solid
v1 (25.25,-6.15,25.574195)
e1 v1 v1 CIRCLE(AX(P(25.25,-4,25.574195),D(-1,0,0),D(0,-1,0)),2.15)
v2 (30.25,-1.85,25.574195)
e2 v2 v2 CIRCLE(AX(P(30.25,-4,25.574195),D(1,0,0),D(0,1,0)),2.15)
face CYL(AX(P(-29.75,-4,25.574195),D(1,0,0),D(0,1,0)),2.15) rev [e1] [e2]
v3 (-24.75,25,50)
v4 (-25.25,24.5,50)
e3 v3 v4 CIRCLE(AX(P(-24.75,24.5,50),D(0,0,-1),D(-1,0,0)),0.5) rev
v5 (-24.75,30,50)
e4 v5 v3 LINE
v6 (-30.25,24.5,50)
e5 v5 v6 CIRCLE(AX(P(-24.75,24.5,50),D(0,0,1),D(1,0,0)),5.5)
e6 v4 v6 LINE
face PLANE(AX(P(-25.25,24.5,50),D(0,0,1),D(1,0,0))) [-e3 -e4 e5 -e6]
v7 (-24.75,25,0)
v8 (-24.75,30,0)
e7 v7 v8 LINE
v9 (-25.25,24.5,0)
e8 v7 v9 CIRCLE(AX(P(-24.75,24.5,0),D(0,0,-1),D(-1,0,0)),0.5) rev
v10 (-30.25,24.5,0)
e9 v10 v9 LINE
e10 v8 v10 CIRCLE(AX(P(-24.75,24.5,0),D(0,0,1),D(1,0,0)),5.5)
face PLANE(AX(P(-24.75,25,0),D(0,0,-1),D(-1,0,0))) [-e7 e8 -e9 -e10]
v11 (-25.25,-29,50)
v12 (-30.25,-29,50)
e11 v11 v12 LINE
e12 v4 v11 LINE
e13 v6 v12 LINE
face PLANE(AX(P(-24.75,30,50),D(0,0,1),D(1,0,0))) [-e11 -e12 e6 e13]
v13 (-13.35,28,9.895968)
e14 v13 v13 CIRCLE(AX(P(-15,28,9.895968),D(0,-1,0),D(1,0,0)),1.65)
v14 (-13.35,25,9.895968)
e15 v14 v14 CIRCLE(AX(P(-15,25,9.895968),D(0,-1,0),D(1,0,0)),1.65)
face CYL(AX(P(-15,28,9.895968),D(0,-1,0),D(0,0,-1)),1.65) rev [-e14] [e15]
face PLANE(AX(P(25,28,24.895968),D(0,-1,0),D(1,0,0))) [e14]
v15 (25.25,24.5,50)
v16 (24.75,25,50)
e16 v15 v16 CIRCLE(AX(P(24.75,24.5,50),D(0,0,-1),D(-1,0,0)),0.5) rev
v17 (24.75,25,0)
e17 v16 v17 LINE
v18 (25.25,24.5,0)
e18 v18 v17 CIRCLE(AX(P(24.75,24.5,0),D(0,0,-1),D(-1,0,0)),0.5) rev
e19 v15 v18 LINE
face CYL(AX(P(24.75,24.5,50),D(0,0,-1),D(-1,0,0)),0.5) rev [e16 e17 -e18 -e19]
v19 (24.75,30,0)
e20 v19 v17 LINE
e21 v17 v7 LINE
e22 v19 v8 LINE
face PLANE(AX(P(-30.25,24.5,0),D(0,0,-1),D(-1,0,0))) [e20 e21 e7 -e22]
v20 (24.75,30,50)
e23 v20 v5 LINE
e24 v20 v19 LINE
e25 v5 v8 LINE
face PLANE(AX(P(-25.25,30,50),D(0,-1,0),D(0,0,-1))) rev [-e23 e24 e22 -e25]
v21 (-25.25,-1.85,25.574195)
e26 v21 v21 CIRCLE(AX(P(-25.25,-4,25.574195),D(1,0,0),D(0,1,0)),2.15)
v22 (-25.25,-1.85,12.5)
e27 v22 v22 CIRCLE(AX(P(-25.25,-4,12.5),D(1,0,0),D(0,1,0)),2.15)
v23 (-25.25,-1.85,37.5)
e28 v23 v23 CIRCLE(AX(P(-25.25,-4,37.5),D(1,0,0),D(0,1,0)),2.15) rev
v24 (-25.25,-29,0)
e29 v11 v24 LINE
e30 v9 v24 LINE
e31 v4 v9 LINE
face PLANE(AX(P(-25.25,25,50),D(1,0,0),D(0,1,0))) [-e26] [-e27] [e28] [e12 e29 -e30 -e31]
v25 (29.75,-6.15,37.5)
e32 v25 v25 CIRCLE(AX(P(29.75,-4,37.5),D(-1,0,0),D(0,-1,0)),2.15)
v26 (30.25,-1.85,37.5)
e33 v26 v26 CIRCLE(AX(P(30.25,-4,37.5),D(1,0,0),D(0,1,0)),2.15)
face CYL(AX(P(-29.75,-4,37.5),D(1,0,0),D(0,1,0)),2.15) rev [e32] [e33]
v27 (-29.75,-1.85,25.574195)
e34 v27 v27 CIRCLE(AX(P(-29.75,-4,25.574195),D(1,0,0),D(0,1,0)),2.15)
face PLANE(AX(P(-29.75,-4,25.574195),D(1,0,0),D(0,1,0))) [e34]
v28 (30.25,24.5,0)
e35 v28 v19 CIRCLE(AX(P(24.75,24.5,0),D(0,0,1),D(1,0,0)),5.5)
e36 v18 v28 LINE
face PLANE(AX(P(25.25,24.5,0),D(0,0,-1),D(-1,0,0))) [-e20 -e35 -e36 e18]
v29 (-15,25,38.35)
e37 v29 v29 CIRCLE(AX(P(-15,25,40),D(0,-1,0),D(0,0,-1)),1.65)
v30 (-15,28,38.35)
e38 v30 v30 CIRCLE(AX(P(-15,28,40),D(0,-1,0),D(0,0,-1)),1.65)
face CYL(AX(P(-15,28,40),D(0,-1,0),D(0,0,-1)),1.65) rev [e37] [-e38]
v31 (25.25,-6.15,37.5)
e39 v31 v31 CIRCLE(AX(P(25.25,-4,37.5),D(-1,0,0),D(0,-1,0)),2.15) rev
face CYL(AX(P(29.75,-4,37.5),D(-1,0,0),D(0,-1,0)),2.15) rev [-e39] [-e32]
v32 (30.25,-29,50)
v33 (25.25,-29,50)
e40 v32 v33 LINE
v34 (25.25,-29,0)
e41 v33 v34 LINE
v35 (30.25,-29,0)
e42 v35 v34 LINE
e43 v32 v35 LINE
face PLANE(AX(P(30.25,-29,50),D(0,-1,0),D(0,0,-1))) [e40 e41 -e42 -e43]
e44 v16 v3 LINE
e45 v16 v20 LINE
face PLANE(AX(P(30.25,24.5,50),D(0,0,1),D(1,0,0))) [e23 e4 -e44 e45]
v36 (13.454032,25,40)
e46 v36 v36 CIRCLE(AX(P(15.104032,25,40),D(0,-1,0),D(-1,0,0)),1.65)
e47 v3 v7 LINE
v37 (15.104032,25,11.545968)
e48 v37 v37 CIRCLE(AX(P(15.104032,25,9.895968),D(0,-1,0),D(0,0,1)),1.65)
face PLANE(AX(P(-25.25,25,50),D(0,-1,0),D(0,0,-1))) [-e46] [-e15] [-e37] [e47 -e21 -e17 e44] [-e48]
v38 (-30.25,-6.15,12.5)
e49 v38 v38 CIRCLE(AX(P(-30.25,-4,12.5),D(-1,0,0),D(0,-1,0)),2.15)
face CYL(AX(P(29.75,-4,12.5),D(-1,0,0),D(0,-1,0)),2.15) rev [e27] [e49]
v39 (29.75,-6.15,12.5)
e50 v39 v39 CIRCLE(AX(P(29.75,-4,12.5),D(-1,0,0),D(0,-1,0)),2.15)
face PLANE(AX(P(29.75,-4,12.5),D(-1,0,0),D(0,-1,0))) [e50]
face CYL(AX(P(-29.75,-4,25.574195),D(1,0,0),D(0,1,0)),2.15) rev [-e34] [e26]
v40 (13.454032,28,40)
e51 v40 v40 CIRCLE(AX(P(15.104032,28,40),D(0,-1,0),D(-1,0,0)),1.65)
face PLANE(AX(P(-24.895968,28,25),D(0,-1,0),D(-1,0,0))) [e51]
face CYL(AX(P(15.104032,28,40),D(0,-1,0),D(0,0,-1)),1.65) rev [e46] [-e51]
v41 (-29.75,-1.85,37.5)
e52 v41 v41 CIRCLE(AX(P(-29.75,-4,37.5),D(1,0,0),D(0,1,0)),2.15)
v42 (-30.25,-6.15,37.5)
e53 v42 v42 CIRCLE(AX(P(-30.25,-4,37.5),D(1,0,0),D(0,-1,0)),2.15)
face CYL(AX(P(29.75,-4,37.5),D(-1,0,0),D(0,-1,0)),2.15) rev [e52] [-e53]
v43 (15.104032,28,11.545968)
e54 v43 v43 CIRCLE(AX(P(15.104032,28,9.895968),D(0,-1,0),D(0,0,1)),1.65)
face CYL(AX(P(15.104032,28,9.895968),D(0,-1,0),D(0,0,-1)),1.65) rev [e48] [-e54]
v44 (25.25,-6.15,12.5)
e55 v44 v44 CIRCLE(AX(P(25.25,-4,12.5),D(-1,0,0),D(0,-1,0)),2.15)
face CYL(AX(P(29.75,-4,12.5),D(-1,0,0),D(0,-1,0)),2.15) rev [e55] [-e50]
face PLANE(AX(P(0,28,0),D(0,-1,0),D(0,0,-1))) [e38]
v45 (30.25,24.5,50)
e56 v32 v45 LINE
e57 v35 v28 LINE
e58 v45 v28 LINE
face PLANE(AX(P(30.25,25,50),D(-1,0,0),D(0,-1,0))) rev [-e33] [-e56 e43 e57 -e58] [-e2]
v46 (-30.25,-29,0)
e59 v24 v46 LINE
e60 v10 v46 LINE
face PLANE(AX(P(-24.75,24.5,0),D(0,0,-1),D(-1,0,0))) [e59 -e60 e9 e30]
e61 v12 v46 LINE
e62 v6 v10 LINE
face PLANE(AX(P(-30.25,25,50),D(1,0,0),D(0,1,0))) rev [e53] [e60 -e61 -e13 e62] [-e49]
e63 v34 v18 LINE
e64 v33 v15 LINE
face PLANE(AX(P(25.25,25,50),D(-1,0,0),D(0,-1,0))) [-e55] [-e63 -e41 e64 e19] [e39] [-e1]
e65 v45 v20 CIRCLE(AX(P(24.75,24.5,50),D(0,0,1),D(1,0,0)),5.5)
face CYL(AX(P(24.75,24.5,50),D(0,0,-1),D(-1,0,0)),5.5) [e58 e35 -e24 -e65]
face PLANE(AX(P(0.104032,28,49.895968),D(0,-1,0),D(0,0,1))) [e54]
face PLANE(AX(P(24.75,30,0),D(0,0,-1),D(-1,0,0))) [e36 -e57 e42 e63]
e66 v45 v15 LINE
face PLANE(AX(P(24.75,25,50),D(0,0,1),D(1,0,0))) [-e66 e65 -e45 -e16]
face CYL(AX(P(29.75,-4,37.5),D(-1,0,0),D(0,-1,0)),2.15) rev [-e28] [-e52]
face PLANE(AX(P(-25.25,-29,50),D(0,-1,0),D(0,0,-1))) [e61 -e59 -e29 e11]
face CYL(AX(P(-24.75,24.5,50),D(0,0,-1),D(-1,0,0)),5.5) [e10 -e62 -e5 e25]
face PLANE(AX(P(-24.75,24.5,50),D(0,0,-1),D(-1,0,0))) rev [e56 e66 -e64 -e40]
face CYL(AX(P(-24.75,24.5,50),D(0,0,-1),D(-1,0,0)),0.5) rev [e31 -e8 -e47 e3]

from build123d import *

# Parameters (mm, degrees)
BASE_FLANGE3_DEPTH = 50
SKETCH21_R         = 1.65
CUT_EXTRUDE1_DEPTH = 3
CIRPATTERN1_COUNT  = 4
SKETCH22_R         = 2.15
CUT_EXTRUDE4_DEPTH = 60
CUT_EXTRUDE3_START = -60
SKETCH23_R         = 2.15
CUT_EXTRUDE3_DEPTH = 60


# Read off the part's stored shape, not the designer's step: Base-Flange3
with BuildPart() as part:
    # Base-Flange3 outline → Base-Flange3 (new body)
    with BuildSketch(Plane.XY):
        with BuildLine():
            Line((-30.25, 24.5), (-30.25, -29))
            Line((-30.25, -29), (-25.25, -29))
            Line((-25.25, -29), (-25.25, 24.5))
            ThreePointArc((-25.25, 24.5), (-25.103553391, 24.853553391), (-24.75, 25))
            Line((-24.75, 25), (24.75, 25))
            ThreePointArc((24.75, 25), (25.103553391, 24.853553391), (25.25, 24.5))
            Line((25.25, 24.5), (25.25, -29))
            Line((25.25, -29), (30.25, -29))
            Line((30.25, -29), (30.25, 24.5))
            ThreePointArc((30.25, 24.5), (28.639087297, 28.389087297), (24.75, 30))
            Line((24.75, 30), (-24.75, 30))
            ThreePointArc((-24.75, 30), (-28.639087297, 28.389087297), (-30.25, 24.5))
        make_face()
    extrude(amount=BASE_FLANGE3_DEPTH)

    # Sketch21 → Cut-Extrude1 (cut)
    with BuildSketch(Plane.XZ.offset(-25)):
        with Locations(Location((-15, 40, 0), (0, 0, 270))):
            Circle(SKETCH21_R)
    cut_extrude1 = extrude(amount=-CUT_EXTRUDE1_DEPTH, mode=Mode.SUBTRACT)

    # CirPattern1: Cut-Extrude1 ×4 about axis
    cirpattern1_axis = Axis((0.052016033, 0, 24.947983967), (0, 1, 0))
    for i in range(1, CIRPATTERN1_COUNT):
        add(cut_extrude1.rotate(cirpattern1_axis, i * 360 / CIRPATTERN1_COUNT), mode=Mode.SUBTRACT)

    # Sketch22 → Cut-Extrude4 (cut)
    with BuildSketch(Plane.ZY.offset(30.25)):
        with Locations(Location((12.5, -4, 0), (0, 0, 270))):
            Circle(SKETCH22_R)
    cut_extrude4 = extrude(amount=-CUT_EXTRUDE4_DEPTH, mode=Mode.SUBTRACT)

    # Mirror2: Cut-Extrude4 across plane
    add(cut_extrude4.mirror(Plane.XY.offset(25)), mode=Mode.SUBTRACT)

    # Sketch23 → Cut-Extrude3 (cut)
    with BuildSketch(Plane(origin=(30.25, 0, 0), x_dir=(0, 0, -1), z_dir=(1, 0, 0)).offset(CUT_EXTRUDE3_START)):
        with Locations(Location((-25.574194975, -4, 0), (0, 0, 90))):
            Circle(SKETCH23_R)
        with Locations(Location((-37.5, -4, 0), (0, 0, 270))):
            Circle(SKETCH23_R)
    extrude(amount=CUT_EXTRUDE3_DEPTH, mode=Mode.SUBTRACT)


solid = part.part
